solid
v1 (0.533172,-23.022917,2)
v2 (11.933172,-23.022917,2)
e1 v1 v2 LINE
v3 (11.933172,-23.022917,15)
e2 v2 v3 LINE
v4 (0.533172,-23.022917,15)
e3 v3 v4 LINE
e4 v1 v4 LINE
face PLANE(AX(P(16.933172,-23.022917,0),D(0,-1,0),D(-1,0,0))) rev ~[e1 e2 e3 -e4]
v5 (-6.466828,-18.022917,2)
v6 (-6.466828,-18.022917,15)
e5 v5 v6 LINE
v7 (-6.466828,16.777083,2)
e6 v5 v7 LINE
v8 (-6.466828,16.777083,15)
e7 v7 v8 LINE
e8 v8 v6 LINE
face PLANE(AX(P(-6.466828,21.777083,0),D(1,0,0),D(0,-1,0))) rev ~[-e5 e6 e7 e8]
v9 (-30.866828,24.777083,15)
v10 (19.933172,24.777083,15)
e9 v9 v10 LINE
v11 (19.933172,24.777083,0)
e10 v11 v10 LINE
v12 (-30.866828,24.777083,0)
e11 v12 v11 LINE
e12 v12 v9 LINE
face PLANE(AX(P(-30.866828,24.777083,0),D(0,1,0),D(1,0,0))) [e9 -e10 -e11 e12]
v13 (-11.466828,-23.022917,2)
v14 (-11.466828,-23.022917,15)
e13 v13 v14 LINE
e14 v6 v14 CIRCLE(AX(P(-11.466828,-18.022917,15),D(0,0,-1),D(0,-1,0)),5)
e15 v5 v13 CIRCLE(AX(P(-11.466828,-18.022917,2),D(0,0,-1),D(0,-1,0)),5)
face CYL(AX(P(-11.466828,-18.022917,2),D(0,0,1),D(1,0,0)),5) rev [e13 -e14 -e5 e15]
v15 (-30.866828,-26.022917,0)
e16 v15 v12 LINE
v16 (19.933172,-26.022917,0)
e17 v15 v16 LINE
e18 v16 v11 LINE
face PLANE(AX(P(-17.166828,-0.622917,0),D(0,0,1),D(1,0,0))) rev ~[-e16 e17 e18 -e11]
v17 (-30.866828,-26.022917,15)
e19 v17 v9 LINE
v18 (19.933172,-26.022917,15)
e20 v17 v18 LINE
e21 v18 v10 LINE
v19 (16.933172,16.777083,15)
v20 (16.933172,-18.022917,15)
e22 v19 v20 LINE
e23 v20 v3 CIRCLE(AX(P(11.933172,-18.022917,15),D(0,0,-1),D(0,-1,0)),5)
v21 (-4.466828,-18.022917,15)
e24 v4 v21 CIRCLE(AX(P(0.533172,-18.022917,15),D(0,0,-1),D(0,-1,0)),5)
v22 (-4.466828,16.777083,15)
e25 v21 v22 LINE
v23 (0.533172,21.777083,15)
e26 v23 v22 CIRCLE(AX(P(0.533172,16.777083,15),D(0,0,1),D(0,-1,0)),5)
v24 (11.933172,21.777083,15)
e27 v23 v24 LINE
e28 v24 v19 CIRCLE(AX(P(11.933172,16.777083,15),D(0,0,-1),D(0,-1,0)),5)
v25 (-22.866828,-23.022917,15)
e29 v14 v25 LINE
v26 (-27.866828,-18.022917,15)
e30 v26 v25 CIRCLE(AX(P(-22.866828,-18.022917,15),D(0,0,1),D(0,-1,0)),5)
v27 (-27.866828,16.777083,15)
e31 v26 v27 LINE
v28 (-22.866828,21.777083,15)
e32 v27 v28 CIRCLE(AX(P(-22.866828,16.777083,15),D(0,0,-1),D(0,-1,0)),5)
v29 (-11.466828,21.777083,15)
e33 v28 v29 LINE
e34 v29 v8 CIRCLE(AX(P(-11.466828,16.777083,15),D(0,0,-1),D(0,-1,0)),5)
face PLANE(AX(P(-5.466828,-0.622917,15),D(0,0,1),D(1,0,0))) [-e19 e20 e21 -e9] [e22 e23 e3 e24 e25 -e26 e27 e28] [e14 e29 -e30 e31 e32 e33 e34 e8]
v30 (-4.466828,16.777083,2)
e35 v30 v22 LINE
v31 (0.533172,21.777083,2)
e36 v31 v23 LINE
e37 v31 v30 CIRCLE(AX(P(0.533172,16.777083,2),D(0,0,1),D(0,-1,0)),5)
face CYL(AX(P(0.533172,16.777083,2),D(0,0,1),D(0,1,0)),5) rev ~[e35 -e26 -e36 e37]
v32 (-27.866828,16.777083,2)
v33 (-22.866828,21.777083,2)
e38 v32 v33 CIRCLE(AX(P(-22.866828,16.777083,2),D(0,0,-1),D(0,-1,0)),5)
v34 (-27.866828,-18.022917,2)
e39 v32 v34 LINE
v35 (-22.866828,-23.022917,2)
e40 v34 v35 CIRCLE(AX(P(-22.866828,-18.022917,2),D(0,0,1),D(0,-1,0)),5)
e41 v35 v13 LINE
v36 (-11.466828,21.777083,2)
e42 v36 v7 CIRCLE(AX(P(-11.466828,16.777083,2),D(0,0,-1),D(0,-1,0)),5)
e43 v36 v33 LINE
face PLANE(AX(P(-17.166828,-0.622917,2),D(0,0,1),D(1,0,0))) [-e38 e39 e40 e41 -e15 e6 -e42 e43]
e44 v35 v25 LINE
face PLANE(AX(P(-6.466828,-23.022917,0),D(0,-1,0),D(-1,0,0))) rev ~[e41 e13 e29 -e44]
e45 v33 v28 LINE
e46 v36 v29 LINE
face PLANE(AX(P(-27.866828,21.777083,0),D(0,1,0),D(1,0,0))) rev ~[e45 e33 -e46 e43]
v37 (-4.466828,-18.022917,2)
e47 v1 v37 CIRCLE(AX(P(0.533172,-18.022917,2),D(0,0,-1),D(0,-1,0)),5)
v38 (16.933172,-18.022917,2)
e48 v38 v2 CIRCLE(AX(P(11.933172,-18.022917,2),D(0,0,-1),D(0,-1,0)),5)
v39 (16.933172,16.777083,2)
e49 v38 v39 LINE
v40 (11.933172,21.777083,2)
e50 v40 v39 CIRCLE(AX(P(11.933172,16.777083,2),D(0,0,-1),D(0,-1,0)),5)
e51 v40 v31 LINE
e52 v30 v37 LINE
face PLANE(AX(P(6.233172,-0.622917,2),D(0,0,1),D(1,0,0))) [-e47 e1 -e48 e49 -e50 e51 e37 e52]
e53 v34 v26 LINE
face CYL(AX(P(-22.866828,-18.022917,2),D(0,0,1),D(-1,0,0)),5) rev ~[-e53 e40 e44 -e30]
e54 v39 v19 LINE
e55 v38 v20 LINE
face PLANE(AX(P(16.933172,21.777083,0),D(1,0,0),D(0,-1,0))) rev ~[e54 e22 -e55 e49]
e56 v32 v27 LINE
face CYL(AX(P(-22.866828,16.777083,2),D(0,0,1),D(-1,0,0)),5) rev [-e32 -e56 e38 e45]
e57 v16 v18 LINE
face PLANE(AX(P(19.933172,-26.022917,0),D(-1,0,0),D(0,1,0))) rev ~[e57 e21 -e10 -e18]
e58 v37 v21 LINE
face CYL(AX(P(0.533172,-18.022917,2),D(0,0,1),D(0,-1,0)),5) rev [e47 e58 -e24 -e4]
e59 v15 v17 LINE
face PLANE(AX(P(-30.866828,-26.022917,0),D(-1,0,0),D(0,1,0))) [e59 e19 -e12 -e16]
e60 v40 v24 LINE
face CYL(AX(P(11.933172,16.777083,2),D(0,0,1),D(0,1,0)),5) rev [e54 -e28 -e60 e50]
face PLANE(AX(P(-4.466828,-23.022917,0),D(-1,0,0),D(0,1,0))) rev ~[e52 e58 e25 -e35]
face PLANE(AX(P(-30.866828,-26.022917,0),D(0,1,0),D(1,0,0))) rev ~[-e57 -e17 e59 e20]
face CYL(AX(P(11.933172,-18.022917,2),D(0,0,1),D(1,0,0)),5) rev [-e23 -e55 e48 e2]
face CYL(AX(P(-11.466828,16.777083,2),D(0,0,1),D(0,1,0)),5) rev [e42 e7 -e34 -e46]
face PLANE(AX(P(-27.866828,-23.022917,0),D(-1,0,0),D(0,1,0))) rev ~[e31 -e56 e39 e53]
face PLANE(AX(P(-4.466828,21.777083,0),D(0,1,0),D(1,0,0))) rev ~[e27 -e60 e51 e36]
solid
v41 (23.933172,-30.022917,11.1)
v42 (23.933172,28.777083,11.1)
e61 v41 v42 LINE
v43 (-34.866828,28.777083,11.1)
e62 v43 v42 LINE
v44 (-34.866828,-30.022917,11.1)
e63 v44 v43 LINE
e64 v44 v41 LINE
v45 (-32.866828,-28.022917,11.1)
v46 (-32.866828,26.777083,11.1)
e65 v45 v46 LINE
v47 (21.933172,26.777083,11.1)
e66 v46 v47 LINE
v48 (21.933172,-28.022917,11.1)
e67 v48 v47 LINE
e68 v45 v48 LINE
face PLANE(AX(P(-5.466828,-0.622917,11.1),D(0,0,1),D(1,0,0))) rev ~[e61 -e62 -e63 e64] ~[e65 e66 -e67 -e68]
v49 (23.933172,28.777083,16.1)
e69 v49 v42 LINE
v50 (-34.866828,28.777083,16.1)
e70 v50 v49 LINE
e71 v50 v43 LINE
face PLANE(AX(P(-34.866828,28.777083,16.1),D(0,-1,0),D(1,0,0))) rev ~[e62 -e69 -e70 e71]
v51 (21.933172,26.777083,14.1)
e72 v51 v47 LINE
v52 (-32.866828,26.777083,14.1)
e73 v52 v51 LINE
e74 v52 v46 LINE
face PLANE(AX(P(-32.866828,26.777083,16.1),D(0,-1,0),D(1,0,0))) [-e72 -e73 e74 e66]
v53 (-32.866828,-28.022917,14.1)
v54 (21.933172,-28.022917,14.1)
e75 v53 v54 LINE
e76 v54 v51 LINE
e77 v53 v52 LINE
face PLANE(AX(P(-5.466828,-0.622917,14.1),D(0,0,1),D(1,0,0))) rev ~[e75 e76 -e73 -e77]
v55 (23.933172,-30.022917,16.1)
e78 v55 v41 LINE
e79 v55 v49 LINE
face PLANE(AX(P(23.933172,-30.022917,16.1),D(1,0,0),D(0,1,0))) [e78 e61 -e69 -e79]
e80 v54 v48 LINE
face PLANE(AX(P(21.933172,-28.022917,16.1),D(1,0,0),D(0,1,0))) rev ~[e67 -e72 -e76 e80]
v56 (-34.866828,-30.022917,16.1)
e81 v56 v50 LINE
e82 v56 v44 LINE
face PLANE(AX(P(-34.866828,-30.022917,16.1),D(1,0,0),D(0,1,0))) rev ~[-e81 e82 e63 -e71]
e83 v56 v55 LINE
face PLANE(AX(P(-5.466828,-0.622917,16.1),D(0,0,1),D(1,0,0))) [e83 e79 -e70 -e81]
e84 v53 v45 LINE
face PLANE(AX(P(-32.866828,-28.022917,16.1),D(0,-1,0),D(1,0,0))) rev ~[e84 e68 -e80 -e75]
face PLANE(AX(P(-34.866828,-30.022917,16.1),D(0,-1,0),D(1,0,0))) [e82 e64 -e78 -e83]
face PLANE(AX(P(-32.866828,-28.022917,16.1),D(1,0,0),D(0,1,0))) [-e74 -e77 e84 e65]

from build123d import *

# Parameters (mm, degrees)
F0_W     = 50.8
F0_H     = 50.8
F0_W_2   = 1
F0_H_2   = 8.95
F0_H_3   = 3
F1_DEPTH = 15
F2_DEPTH = 2
F3_R     = 5
F5_W     = 58.8
F5_H     = 58.8
F5_W_2   = 54.8
F5_H_2   = 54.8
F6_DEPTH = 5
F5_W_3   = 50.8
F5_H_3   = 50.8
F7_DEPTH = 2


with BuildPart() as f1:
    # F0 (on Top) → F1 (new body)
    with BuildSketch(Plane.XY):
        with Locations((-5.4668284297, -0.6229165018)):
            Rectangle(F0_W, F0_H)
        Polygon((-27.8668284297, 12.8270834982), (-27.8668284297, 21.7770834982), (-6.4668284297, 21.7770834982), (-5.4668284297, 21.7770834982), (-4.4668284297, 21.7770834982), (16.9331715703, 21.7770834982), (16.9331715703, 12.8270834982), (16.9331715703, 9.8270834982), (16.9331715703, 0.8770834982), (16.9331715703, -2.1229165018), (16.9331715703, -11.0729165018), (16.9331715703, -14.0729165018), (16.9331715703, -23.0229165018), (-4.4668284297, -23.0229165018), (-5.4668284297, -23.0229165018), (-6.4668284297, -23.0229165018), (-27.8668284297, -23.0229165018), (-27.8668284297, -14.0729165018), (-27.8668284297, -11.0729165018), (-27.8668284297, -2.1229165018), (-27.8668284297, 0.8770834982), (-27.8668284297, 9.8270834982), align=None, mode=Mode.SUBTRACT)
        with Locations((-5.9668284297, -6.5979165018)):
            Rectangle(F0_W_2, F0_H_2)
        with Locations((-4.9668284297, -6.5979165018)):
            Rectangle(F0_W_2, F0_H_2)
        with Locations((-5.9668284297, -12.5729165018)):
            Rectangle(F0_W_2, F0_H_3)
        with Locations((-4.9668284297, -12.5729165018)):
            Rectangle(F0_W_2, F0_H_3)
        with Locations((-5.9668284297, -18.5479165018)):
            Rectangle(F0_W_2, F0_H_2)
        with Locations((-4.9668284297, -18.5479165018)):
            Rectangle(F0_W_2, F0_H_2)
        with Locations((-5.9668284297, -0.6229165018)):
            Rectangle(F0_W_2, F0_H_3)
        with Locations((-4.9668284297, -0.6229165018)):
            Rectangle(F0_W_2, F0_H_3)
        with Locations((-5.9668284297, 5.3520834982)):
            Rectangle(F0_W_2, F0_H_2)
        with Locations((-4.9668284297, 5.3520834982)):
            Rectangle(F0_W_2, F0_H_2)
        with Locations((-5.9668284297, 17.3020834982)):
            Rectangle(F0_W_2, F0_H_2)
        with Locations((-4.9668284297, 17.3020834982)):
            Rectangle(F0_W_2, F0_H_2)
        with Locations((-5.9668284297, 11.3270834982)):
            Rectangle(F0_W_2, F0_H_3)
        with Locations((-4.9668284297, 11.3270834982)):
            Rectangle(F0_W_2, F0_H_3)
    extrude(amount=F1_DEPTH)

    # F0 (on Top) → F2 (join)
    with BuildSketch(Plane.XY):
        Polygon((-6.4668284297, 21.7770834982), (-27.8668284297, 21.7770834982), (-27.8668284297, 12.8270834982), (-27.8668284297, 9.8270834982), (-27.8668284297, 0.8770834982), (-27.8668284297, -2.1229165018), (-27.8668284297, -11.0729165018), (-27.8668284297, -14.0729165018), (-27.8668284297, -23.0229165018), (-6.4668284297, -23.0229165018), (-6.4668284297, -14.0729165018), (-6.4668284297, -11.0729165018), (-6.4668284297, -2.1229165018), (-6.4668284297, 0.8770834982), (-6.4668284297, 9.8270834982), (-6.4668284297, 12.8270834982), align=None)
        Polygon((16.9331715703, 21.7770834982), (-4.4668284297, 21.7770834982), (-4.4668284297, 12.8270834982), (-4.4668284297, 9.8270834982), (-4.4668284297, 0.8770834982), (-4.4668284297, -2.1229165018), (-4.4668284297, -11.0729165018), (-4.4668284297, -14.0729165018), (-4.4668284297, -23.0229165018), (16.9331715703, -23.0229165018), (16.9331715703, -14.0729165018), (16.9331715703, -11.0729165018), (16.9331715703, -2.1229165018), (16.9331715703, 0.8770834982), (16.9331715703, 9.8270834982), (16.9331715703, 12.8270834982), align=None)
    extrude(amount=F2_DEPTH)

    # F3
    f3_edges = [f1.edges().sort_by_distance(p)[0] for p in [
        (-27.866828, -23.022917, 8.5),
        (16.933172, -23.022917, 8.5),
        (-27.866828, 21.777083, 8.5),
        (16.933172, 21.777083, 8.5),
        (-4.466828, 21.777083, 8.5),
        (-6.466828, 21.777083, 8.5),
        (-6.466828, -23.022917, 8.5),
        (-4.466828, -23.022917, 8.5),
    ]]
    fillet(f3_edges, radius=F3_R)


with BuildPart() as f6:
    # F5 (on offset) → F6 (new body)
    with BuildSketch(Plane.XY.offset(16.1)):
        with Locations((-5.4668284297, -0.6229165018)):
            Rectangle(F5_W, F5_H)
        with Locations((-5.4668284297, -0.6229165018)):
            Rectangle(F5_W_2, F5_H_2, mode=Mode.SUBTRACT)
    extrude(amount=-F6_DEPTH)

    # F5 (on offset) → F7 (join)
    with BuildSketch(Plane.XY.offset(16.1)):
        with Locations((-5.4668284297, -0.6229165018)):
            Rectangle(F5_W_2, F5_H_2)
        with Locations((-5.4668284297, -0.6229165018)):
            Rectangle(F5_W_3, F5_H_3, mode=Mode.SUBTRACT)
        with Locations((-5.4668284297, -0.6229165018)):
            Rectangle(F5_W_3, F5_H_3)
    extrude(amount=-F7_DEPTH)


solid = Compound([f1.part, f6.part])
